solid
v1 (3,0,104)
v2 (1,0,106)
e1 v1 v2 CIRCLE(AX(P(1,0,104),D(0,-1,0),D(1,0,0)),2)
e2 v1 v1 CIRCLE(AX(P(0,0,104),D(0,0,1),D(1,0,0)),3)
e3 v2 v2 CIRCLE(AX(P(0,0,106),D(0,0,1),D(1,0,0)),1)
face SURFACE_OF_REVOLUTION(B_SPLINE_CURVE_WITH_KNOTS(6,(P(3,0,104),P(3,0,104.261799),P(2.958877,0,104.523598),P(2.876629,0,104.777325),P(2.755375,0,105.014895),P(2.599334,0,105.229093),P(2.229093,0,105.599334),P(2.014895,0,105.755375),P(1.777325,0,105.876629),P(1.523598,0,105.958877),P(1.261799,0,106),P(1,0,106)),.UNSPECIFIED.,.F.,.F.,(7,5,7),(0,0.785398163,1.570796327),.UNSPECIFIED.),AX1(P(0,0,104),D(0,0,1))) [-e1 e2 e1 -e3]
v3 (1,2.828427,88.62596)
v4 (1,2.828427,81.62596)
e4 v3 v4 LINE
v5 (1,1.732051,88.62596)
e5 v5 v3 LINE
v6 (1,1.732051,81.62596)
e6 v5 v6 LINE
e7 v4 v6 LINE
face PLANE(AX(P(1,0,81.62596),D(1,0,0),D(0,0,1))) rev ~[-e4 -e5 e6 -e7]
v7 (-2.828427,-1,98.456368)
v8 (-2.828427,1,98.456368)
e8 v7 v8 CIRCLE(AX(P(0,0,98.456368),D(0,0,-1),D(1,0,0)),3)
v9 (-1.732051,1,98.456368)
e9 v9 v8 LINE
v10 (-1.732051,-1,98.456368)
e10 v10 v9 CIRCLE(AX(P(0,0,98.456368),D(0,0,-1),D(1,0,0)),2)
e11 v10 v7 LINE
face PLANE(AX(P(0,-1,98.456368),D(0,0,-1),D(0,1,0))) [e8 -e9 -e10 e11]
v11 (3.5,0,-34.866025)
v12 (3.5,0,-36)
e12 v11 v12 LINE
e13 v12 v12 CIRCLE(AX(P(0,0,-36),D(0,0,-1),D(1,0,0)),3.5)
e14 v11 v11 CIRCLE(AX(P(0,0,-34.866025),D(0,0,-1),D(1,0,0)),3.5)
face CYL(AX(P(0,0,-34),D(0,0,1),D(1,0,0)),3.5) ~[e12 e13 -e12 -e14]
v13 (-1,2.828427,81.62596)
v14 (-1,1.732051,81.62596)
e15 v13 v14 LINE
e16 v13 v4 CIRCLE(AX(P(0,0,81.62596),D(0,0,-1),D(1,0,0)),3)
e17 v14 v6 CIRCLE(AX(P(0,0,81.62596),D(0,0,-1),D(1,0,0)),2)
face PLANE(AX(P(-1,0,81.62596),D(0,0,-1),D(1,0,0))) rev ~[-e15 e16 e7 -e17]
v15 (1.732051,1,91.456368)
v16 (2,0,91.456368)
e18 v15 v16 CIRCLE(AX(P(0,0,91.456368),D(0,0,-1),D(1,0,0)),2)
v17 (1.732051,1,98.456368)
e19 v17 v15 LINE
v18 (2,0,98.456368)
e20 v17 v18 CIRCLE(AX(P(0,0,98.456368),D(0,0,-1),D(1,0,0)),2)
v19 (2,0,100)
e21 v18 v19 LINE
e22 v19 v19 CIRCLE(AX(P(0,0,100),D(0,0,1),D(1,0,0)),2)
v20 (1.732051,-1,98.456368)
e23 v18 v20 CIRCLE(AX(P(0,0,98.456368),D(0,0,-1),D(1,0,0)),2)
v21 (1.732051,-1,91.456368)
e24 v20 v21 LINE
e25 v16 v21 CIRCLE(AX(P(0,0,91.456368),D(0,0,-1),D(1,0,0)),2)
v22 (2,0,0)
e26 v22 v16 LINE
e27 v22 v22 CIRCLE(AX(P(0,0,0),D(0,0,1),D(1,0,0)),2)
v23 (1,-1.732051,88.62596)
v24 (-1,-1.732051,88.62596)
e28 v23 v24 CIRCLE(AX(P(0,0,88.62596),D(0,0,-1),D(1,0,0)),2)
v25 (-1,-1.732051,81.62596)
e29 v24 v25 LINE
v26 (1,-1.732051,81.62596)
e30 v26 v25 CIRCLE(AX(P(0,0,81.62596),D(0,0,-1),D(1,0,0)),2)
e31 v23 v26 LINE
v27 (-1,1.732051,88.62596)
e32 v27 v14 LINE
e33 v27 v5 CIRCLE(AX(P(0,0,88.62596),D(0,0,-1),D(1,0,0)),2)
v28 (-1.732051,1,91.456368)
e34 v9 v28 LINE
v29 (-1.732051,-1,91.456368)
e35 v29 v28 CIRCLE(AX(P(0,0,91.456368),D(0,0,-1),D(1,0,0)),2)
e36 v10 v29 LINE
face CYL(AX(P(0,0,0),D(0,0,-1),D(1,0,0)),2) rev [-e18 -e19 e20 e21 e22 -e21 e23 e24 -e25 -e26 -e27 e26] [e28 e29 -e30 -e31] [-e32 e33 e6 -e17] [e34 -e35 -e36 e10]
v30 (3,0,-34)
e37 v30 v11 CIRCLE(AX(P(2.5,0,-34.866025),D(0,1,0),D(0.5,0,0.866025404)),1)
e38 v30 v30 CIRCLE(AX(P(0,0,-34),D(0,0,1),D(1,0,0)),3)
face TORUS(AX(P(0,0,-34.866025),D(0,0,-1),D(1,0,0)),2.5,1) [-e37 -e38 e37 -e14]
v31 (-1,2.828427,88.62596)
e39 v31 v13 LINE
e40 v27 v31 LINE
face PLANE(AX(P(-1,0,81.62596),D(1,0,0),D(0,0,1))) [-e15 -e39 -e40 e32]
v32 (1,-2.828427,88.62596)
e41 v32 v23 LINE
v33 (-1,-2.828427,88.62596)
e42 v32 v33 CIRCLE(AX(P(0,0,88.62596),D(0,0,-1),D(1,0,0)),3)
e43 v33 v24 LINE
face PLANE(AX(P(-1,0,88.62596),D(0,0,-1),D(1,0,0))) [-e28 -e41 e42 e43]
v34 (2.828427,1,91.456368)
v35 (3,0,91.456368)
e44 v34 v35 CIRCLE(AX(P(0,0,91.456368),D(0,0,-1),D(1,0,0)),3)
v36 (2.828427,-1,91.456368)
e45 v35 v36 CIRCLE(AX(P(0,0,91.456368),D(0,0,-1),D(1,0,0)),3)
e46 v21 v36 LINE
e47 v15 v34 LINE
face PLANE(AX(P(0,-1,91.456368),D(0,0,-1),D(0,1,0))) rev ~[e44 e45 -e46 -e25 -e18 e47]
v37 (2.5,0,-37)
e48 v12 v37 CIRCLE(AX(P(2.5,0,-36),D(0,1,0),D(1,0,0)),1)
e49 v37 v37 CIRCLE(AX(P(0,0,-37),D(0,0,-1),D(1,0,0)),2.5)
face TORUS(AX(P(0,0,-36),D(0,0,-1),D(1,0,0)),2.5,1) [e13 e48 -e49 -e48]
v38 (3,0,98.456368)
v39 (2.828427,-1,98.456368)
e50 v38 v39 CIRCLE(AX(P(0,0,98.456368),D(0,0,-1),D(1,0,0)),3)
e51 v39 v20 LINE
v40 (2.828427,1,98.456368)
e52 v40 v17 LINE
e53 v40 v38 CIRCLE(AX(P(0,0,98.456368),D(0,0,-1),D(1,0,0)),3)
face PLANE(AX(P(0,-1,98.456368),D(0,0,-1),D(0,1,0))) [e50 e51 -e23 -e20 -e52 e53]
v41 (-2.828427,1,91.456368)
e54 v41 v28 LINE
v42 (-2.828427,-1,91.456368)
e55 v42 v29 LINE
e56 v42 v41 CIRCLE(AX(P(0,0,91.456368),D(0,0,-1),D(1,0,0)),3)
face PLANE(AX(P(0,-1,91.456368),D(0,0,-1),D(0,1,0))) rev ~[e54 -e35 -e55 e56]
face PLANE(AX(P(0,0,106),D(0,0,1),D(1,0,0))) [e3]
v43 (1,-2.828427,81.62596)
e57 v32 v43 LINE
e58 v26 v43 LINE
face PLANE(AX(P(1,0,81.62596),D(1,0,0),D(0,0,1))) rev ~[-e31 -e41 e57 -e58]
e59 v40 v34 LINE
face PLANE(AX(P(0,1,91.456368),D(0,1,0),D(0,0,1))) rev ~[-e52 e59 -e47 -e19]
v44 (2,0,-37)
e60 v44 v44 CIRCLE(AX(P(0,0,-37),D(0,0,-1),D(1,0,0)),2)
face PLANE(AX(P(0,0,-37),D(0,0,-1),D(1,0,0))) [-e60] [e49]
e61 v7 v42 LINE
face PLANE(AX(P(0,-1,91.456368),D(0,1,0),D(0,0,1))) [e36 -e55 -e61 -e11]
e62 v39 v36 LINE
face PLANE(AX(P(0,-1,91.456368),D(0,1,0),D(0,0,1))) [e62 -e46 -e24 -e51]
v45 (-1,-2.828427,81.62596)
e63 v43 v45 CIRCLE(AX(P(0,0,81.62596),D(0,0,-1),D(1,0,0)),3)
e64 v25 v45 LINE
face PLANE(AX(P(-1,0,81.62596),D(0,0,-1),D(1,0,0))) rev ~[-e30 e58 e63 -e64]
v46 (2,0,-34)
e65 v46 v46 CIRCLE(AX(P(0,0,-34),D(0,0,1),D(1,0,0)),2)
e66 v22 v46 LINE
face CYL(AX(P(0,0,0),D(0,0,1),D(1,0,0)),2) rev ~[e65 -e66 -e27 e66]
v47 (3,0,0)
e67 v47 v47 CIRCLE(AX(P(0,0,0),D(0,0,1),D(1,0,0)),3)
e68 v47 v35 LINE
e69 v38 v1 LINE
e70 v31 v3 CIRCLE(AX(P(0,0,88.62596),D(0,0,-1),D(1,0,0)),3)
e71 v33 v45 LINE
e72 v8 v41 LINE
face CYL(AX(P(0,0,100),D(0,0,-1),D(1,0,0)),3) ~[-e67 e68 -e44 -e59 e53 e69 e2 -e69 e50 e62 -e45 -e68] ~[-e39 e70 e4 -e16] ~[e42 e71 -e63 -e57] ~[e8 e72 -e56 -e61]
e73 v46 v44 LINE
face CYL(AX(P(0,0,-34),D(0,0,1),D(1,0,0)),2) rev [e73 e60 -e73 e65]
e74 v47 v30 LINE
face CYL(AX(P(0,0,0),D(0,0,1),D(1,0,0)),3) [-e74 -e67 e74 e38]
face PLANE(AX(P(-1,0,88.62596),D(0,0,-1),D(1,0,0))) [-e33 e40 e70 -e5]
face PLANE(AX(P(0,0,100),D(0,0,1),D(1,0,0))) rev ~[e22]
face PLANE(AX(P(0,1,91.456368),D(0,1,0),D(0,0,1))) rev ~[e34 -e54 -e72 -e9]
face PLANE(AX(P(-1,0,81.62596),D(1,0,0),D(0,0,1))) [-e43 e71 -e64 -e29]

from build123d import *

# Parameters (mm, degrees)
F0_R      = 3
F0_R_2    = 2
F1_DEPTH  = 100
F2_R      = 3
F2_R_2    = 2
F3_DEPTH  = 6
F4_W      = 2
F4_H      = 7
F6_DEPTH  = 12.5
F5_W      = 2
F5_H      = 7
F7_DEPTH  = 12.5
F8_R      = 2
F9_DEPTH  = 34
F10_R     = 3.5
F10_R_2   = 3
F10_R_3   = 2
F11_DEPTH = 3


# Not quite as in the source:
# - a fillet or chamfer that OpenCascade refuses, or shapes differently, is made with other operations: its cross-section is extruded or revolved along the edge and cut away or added


with BuildPart() as f1:
    # F0 (on Top) → F1 (new body)
    with BuildSketch(Plane.XY):
        Circle(F0_R)
        Circle(F0_R_2, mode=Mode.SUBTRACT)
    extrude(amount=F1_DEPTH)

    # F2 (on face) → F3 (join)
    with BuildSketch(Plane.XY.offset(100)):
        Circle(F2_R)
        Circle(F2_R_2, mode=Mode.SUBTRACT)
        Circle(F2_R_2)
    extrude(amount=F3_DEPTH)

    # F4 (on Front) → F6 (cut, symmetric)
    with BuildSketch(Plane.XZ):
        with Locations((0, 85.1259604096)):
            Rectangle(F4_W, F4_H)
    extrude(amount=F6_DEPTH, both=True, mode=Mode.SUBTRACT)

    # F5 (on Right) → F7 (cut, symmetric)
    with BuildSketch(Plane.YZ):
        with Locations((0, 94.9563682079)):
            Rectangle(F5_W, F5_H)
    extrude(amount=F7_DEPTH, both=True, mode=Mode.SUBTRACT)

    # F8
    f8_edges = [f1.edges().sort_by_distance(p)[0] for p in [
        (-3, 0, 106),
    ]]
    fillet(f8_edges, radius=F8_R)

    # F9 (add): a face of the model
    f9_faces = [f1.faces().sort_by_distance(p)[0] for p in [
        (-2.9151471863, 0, 0),
    ]]
    extrude(f9_faces, amount=F9_DEPTH)

    # F10 (on face) → F11 (join)
    with BuildSketch(Plane(origin=(0, 0, -34), x_dir=(1, 0, 0), z_dir=(0, 0, -1))):
        Circle(F10_R)
        Circle(F10_R_2, mode=Mode.SUBTRACT)
        Circle(F10_R_2)
        Circle(F10_R_3, mode=Mode.SUBTRACT)
    extrude(amount=F11_DEPTH)

    # F12: fillet of radius 1 on 2 edges, made by hand

    # F12_s1 → F12_t2 (revolve, cut)
    with BuildSketch(Plane.XZ):
        with BuildLine():
            ThreePointArc((3, -34), (3.3660254038, -34.3660254038), (3.5, -34.8660254038))
            Line((3.5, -34.8660254038), (3.5, -34))
            Line((3.5, -34), (3, -34))
        make_face()
    revolve(axis=Axis((0, 0, -34), (0, 0, -1)), mode=Mode.SUBTRACT)

    # F12_s3 → F12_t4 (revolve, cut)
    with BuildSketch(Plane.XZ):
        with BuildLine():
            ThreePointArc((3.5, -36), (3.2071067812, -36.7071067812), (2.5, -37))
            Line((2.5, -37), (3.5, -37))
            Line((3.5, -37), (3.5, -36))
        make_face()
    revolve(axis=Axis((0, 0, -37), (0, 0, -1)), mode=Mode.SUBTRACT)


solid = f1.part
